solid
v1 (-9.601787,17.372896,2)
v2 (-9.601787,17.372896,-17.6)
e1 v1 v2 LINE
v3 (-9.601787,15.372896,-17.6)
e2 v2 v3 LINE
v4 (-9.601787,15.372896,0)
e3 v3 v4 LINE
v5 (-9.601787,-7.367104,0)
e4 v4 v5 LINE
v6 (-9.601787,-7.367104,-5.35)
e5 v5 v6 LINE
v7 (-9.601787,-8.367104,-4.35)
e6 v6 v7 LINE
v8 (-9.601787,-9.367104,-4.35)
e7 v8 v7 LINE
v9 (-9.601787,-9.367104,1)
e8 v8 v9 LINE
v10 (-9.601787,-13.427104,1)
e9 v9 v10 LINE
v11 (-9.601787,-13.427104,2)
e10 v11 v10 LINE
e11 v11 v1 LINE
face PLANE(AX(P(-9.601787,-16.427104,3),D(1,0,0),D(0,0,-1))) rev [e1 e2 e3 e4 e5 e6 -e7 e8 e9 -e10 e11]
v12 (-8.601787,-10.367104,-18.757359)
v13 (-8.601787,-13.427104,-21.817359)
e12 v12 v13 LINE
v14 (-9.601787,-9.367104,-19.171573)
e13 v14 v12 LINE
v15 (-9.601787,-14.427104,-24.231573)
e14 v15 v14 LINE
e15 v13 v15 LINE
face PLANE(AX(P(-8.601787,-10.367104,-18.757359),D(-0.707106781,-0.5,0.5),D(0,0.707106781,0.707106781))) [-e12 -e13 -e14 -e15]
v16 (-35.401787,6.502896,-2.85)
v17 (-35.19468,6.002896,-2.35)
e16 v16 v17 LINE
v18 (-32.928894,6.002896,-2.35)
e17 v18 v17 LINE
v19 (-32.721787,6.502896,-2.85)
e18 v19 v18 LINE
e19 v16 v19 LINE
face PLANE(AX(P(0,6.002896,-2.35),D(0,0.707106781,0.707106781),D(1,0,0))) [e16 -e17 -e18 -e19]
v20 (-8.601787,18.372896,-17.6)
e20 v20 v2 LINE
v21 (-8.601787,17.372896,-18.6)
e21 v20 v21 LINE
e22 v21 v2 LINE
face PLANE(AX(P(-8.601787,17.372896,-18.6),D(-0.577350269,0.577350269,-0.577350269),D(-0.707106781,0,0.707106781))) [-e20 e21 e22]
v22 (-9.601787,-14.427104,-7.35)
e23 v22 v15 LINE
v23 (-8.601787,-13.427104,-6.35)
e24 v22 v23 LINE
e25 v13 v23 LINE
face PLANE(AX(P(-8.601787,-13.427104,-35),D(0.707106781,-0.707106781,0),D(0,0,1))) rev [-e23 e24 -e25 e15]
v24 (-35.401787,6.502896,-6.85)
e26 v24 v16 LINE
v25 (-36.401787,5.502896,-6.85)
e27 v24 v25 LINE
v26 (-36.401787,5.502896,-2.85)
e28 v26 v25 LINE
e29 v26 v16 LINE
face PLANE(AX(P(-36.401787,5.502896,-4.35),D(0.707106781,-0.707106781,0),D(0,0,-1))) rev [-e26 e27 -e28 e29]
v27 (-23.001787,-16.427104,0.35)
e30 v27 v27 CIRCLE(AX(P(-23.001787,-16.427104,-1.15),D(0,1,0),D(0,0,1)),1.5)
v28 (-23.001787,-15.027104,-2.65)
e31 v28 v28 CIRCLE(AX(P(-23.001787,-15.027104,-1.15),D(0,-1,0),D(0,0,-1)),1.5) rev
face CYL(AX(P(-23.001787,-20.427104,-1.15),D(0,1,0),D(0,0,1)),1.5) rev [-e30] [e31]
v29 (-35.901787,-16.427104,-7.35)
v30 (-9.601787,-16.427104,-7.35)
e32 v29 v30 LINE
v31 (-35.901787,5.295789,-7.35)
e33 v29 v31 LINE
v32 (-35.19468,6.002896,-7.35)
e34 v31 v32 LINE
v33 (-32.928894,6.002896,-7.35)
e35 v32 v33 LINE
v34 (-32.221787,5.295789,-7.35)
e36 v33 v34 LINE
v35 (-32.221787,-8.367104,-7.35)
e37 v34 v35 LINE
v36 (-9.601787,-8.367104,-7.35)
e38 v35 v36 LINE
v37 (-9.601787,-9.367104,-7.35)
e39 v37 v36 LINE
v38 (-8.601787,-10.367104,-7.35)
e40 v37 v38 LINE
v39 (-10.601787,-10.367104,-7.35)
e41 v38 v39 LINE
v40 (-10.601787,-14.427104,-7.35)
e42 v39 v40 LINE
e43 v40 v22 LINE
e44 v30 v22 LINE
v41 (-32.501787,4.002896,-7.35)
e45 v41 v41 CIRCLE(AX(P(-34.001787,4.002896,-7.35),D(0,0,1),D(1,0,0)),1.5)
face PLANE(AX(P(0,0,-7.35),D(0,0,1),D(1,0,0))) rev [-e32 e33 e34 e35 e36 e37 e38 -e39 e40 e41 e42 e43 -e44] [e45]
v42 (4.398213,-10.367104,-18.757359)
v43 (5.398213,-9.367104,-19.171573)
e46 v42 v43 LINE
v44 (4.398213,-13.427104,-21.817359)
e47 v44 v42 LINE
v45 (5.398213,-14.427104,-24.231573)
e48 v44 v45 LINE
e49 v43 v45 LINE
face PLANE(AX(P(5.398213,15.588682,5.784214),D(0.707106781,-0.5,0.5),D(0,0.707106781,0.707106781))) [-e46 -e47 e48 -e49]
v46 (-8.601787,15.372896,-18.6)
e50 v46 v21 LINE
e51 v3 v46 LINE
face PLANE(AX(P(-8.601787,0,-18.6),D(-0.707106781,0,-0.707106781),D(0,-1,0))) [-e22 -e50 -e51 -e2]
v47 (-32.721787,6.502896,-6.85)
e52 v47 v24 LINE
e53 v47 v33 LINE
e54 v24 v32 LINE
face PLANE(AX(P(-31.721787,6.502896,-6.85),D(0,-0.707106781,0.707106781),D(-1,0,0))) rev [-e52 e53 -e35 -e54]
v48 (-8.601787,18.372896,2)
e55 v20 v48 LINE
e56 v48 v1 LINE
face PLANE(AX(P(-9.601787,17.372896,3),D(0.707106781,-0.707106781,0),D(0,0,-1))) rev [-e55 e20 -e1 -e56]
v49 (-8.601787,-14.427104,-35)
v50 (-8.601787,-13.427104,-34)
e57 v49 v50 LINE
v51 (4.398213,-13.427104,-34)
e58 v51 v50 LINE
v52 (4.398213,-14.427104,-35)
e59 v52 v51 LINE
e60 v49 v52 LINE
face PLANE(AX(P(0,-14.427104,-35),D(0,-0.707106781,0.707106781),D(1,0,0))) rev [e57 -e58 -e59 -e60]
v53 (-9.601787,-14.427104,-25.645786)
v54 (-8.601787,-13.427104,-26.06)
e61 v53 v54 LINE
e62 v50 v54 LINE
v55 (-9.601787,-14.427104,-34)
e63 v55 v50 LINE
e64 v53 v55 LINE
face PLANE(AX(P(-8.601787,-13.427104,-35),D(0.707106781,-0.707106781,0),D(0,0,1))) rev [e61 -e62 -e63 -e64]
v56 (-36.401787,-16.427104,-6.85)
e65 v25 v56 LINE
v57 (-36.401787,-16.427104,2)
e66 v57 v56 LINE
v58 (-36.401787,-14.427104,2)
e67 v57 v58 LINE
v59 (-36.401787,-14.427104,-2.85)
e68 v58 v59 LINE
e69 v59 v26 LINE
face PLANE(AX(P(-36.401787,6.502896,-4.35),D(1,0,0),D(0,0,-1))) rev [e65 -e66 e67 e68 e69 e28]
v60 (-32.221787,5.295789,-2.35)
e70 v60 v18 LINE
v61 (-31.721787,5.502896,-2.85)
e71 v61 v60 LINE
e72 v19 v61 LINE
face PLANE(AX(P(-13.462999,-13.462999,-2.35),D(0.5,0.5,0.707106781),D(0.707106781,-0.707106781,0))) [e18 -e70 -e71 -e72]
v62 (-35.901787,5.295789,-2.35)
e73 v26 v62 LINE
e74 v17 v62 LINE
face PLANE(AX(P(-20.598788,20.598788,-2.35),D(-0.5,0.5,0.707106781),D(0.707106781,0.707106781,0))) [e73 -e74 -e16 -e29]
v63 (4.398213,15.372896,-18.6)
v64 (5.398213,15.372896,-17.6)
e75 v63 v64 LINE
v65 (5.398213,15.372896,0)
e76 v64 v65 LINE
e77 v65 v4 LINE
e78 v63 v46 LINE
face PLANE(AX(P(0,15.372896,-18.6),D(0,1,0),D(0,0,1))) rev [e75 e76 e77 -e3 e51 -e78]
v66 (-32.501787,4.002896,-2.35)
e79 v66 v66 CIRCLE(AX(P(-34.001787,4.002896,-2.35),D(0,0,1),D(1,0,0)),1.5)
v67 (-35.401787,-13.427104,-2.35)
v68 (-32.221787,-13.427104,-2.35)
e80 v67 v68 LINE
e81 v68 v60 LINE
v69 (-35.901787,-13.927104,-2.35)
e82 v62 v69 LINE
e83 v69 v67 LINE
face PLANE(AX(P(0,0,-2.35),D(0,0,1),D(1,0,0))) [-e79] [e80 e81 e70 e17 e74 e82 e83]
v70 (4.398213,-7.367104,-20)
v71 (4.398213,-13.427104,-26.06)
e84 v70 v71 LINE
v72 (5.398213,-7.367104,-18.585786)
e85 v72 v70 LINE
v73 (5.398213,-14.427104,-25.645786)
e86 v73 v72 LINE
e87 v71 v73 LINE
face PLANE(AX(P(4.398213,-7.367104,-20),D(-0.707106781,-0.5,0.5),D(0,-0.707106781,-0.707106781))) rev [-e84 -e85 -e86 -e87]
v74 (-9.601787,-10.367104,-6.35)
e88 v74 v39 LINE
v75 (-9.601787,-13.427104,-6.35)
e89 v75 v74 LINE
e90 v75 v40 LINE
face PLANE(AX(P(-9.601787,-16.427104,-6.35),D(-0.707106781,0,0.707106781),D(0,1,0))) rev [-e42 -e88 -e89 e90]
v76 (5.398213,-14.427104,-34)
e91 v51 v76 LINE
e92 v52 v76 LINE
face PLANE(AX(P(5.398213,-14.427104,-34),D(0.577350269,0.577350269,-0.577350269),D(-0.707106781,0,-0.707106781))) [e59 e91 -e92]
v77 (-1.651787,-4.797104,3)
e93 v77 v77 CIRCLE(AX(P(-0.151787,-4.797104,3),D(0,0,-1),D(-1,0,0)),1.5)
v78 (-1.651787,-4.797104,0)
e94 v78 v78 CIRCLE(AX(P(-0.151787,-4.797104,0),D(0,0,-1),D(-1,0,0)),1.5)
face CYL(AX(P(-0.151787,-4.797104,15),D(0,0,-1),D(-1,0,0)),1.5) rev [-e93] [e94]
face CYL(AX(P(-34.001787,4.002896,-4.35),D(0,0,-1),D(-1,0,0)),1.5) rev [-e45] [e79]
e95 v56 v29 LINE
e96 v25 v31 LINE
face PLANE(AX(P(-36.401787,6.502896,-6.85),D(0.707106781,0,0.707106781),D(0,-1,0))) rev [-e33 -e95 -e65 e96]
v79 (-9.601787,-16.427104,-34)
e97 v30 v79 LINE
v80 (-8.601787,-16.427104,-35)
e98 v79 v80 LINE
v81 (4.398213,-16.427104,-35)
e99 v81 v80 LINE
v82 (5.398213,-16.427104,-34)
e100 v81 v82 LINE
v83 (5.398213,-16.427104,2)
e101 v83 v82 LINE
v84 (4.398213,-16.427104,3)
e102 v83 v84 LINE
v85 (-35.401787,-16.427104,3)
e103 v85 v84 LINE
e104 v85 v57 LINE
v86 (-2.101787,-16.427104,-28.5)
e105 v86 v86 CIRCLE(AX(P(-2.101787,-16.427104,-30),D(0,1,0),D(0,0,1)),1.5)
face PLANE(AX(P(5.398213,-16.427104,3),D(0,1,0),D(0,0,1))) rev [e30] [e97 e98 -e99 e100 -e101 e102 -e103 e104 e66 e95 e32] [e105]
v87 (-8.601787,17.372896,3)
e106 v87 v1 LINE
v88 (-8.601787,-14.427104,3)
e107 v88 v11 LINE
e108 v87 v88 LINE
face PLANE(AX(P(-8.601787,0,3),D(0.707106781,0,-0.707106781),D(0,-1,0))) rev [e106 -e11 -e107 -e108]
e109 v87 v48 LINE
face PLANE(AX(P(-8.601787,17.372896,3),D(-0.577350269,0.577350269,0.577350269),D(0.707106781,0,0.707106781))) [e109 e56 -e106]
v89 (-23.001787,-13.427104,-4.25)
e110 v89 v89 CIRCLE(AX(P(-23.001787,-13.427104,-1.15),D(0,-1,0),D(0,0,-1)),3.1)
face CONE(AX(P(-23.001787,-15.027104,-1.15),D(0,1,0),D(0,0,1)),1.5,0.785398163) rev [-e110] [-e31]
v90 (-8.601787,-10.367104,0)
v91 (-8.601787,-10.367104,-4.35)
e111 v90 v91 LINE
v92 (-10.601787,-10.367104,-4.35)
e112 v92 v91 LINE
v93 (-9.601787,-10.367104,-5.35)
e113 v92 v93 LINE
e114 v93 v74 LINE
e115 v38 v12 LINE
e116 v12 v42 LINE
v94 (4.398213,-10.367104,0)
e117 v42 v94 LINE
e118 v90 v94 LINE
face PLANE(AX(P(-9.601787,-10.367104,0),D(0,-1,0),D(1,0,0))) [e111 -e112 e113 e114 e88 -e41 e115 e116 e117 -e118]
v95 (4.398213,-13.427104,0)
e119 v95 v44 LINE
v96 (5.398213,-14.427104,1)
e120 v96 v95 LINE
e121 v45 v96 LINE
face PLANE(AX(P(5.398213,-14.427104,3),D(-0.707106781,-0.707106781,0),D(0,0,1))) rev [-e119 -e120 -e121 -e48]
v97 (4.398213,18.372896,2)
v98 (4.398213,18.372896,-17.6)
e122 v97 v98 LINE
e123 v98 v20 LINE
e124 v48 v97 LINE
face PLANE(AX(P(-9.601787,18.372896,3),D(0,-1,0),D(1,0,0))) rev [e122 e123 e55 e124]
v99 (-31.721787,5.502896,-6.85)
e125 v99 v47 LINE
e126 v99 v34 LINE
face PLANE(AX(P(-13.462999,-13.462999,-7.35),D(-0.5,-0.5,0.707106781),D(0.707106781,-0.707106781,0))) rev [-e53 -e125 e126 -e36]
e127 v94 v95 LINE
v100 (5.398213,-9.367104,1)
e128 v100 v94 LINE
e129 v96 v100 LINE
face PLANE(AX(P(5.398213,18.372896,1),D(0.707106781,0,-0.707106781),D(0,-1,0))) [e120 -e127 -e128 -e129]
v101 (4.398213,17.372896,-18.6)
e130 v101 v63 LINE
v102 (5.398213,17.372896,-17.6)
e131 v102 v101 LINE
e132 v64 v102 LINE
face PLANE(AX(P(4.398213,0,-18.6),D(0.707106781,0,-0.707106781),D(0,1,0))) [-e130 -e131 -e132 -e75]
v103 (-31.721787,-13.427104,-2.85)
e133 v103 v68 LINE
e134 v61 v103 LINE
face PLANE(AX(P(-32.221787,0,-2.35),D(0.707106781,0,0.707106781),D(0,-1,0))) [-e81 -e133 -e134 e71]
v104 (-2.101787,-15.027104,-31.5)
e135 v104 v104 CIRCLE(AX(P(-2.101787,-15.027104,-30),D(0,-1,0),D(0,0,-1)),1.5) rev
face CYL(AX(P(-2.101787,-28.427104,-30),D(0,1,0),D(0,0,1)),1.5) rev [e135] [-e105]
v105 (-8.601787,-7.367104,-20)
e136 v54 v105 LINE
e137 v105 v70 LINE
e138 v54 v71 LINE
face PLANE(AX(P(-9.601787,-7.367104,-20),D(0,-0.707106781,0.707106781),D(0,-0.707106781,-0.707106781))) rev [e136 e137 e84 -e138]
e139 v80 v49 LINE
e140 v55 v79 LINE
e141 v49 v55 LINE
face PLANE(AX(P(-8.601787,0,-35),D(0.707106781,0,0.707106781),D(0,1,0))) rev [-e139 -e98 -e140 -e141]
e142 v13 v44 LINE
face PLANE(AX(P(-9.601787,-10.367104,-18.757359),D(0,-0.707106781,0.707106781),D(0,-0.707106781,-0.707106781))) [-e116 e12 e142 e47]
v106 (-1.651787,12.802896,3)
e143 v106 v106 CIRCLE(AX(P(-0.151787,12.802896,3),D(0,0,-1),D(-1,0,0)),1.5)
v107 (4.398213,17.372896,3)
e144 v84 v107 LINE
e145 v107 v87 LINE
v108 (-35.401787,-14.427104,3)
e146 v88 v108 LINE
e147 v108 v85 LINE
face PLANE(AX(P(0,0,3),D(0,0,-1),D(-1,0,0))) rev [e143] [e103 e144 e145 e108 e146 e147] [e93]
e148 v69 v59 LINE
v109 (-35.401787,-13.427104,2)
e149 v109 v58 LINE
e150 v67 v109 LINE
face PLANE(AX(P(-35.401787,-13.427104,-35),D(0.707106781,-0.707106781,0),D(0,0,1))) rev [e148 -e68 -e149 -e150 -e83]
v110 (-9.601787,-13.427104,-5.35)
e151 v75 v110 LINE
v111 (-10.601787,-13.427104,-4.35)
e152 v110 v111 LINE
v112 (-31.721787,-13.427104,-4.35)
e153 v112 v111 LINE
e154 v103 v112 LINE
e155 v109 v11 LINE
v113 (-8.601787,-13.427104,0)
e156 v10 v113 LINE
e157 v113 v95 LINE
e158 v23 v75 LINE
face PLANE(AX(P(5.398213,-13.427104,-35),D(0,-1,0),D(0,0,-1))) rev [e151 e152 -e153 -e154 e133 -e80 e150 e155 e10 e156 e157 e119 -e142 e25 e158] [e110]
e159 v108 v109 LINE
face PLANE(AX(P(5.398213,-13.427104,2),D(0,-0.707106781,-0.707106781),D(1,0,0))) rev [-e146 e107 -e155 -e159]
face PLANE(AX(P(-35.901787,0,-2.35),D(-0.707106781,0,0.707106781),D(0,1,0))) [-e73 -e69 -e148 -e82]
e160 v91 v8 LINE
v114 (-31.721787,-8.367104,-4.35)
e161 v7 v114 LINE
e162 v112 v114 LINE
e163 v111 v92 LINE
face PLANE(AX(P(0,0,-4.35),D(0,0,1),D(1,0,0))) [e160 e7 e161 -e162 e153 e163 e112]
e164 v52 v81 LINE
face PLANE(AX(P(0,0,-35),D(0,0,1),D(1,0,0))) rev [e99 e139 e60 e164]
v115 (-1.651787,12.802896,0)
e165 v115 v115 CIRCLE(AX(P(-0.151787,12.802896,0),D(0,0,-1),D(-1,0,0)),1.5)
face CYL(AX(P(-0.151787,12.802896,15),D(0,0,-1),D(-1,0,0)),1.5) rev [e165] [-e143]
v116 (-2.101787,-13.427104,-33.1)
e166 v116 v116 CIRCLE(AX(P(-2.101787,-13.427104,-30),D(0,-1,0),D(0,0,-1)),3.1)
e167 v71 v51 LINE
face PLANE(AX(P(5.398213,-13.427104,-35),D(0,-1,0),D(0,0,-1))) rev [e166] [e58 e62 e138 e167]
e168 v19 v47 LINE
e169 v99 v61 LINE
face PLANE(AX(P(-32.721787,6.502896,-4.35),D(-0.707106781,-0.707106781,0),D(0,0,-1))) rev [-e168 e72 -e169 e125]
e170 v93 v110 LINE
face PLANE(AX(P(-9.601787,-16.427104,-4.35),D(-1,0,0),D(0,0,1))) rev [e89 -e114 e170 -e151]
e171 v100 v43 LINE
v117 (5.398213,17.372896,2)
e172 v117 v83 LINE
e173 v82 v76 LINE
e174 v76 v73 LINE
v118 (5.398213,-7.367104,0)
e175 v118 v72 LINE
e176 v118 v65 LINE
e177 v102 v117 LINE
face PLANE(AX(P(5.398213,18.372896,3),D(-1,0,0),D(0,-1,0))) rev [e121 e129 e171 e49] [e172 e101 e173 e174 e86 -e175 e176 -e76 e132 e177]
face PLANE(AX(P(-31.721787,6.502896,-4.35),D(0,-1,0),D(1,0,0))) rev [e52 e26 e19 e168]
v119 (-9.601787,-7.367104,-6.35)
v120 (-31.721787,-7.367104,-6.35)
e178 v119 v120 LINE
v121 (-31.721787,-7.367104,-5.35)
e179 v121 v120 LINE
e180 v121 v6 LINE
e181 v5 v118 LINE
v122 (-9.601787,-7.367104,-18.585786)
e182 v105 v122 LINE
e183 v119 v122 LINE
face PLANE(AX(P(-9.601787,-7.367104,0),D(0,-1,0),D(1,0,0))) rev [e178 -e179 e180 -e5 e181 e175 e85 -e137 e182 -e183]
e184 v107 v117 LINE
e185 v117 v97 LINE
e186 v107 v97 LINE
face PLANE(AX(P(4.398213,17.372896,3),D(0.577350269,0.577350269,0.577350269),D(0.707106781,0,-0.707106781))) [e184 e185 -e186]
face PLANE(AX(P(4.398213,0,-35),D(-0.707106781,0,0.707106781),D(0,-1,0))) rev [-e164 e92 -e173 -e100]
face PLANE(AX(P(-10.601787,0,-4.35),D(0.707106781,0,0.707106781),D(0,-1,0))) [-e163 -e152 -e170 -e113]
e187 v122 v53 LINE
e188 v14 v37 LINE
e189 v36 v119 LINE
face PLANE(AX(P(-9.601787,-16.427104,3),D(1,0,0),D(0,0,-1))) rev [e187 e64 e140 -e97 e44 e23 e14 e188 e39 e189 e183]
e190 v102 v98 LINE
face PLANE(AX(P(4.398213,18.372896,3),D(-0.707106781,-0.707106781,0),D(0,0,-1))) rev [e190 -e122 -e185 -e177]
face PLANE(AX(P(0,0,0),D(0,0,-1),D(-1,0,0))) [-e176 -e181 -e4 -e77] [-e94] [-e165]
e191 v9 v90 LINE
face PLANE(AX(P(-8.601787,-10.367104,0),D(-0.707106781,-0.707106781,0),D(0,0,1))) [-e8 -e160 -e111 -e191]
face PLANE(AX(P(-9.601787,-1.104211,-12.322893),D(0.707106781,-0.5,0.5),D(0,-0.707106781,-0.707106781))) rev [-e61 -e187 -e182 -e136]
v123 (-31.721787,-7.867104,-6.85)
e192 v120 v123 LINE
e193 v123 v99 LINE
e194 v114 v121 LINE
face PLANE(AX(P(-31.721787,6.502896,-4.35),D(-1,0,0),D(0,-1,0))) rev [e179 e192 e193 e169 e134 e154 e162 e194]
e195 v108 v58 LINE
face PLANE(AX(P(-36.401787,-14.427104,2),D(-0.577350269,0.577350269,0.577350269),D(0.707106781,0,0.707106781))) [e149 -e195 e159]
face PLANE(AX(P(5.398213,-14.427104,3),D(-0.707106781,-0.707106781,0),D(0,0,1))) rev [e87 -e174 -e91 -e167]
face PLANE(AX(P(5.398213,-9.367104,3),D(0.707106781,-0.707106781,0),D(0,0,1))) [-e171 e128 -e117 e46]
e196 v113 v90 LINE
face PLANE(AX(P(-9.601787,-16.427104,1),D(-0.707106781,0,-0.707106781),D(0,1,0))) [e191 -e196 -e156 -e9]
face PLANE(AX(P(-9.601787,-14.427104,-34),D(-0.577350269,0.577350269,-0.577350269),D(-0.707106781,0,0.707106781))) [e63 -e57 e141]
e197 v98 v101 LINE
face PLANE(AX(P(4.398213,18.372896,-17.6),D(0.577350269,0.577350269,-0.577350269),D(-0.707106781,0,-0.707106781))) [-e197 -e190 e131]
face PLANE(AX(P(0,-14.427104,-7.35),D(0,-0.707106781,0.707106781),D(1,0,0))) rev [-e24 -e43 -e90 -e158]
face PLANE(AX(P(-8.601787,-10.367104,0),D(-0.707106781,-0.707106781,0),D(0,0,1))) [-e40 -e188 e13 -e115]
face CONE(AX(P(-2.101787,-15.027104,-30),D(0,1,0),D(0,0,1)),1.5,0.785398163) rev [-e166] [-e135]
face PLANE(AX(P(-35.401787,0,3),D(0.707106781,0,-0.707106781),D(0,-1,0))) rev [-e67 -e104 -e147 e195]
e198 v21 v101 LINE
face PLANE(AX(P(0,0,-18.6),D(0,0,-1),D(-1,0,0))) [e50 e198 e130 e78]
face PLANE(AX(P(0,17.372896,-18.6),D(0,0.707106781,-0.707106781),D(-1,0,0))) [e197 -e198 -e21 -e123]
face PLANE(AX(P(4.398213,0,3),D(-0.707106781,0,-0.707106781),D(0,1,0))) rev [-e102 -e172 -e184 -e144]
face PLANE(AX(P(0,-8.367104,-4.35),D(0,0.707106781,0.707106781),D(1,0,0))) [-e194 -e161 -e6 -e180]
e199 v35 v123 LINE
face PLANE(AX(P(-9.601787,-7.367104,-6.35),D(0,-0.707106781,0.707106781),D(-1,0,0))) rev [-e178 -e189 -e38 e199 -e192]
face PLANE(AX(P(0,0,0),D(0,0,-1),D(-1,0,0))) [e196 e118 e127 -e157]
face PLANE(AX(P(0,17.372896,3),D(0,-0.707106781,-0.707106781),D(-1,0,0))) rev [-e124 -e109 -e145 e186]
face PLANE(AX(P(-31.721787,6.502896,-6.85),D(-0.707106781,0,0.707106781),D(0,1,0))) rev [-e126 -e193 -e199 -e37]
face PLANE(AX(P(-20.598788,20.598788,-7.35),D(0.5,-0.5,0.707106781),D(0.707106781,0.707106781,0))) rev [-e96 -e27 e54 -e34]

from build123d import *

# Parameters (mm, degrees)
ESBO_O3_W                 = 15
ESBO_O3_H                 = 34.8
RESSALTO_EXTRUS_O1_DEPTH  = 3
ESBO_O5_W                 = 15
ESBO_O5_H                 = 3
RESSALTO_EXTRUS_O2_DEPTH  = 18.6
ESBO_O6_W                 = 15
ESBO_O6_H                 = 3
RESSALTO_EXTRUS_O3_DEPTH  = 35
ESBO_O8_R                 = 1.5
CORTE_EXTRUS_O1_DEPTH     = 15
ESBO_O10_R                = 1.5
CORTE_EXTRUS_O3_DEPTH     = 15
CHANFRO2_SIZE             = 1.6
RESSALTO_EXTRUS_O5_DEPTH  = 15
ESBO_O14_R                = 1.5
RESSALTO_EXTRUS_O7_DEPTH  = 3
RESSALTO_EXTRUS_O9_DEPTH  = 26.8
CHANFRO6_SIZE             = 1
CHANFRO7_SIZE             = 1
CHANFRO8_SIZE             = 1
ESBO_O19_W                = 4.68
ESBO_O19_H                = 19.93
ESBO_O19_R                = 1.5
RESSALTO_EXTRUS_O10_DEPTH = 2
ESBO_O17_R                = 1.5
CORTE_EXTRUS_O4_DEPTH     = 7
CHANFRO4_SIZE             = 1
CHANFRO10_SIZE            = 1.6
CHANFRO11_SIZE            = 0.5


with BuildPart() as part:
    # Esboço3 → Ressalto-extrusão1 (new body)
    with BuildSketch(Plane.XY):
        with Locations((-2.101786792, 0.972895567)):
            Rectangle(ESBO_O3_W, ESBO_O3_H)
    extrude(amount=RESSALTO_EXTRUS_O1_DEPTH)

    # Esboço5 → Ressalto-extrusão2 (add)
    with BuildSketch(Plane(origin=(0, 0, 0), x_dir=(-1, 0, 0), z_dir=(0, 0, -1))):
        with Locations((2.101786792, 16.872895567)):
            Rectangle(ESBO_O5_W, ESBO_O5_H)
    extrude(amount=RESSALTO_EXTRUS_O2_DEPTH)

    # Esboço6 → Ressalto-extrusão3 (add)
    with BuildSketch(Plane(origin=(0, 0, 0), x_dir=(-1, 0, 0), z_dir=(0, 0, -1))):
        with Locations((2.101786792, -14.927104433)):
            Rectangle(ESBO_O6_W, ESBO_O6_H)
    extrude(amount=RESSALTO_EXTRUS_O3_DEPTH)

    # Esboço8 → Corte-extrusão1 (cut)
    with BuildSketch(Plane(origin=(0, 0, 0), x_dir=(-1, 0, 0), z_dir=(0, 0, -1))):
        with Locations((0.151786792, 12.802895567)):
            Circle(ESBO_O8_R)
        with Locations((0.151786792, -4.797104433)):
            Circle(ESBO_O8_R)
    extrude(amount=-CORTE_EXTRUS_O1_DEPTH, mode=Mode.SUBTRACT)

    # Esboço10 → Corte-extrusão3 (cut)
    with BuildSketch(Plane(origin=(0, -13.427104433, 0), x_dir=(1, 0, 0), z_dir=(0, 1, 0))):
        with Locations(Location((-2.101786792, 30, 0), (0, 0, 270))):
            Circle(ESBO_O10_R)
    extrude(amount=-CORTE_EXTRUS_O3_DEPTH, mode=Mode.SUBTRACT)

    # Chanfro2
    chanfro2_edges = [part.edges().sort_by_distance(p)[0] for p in [
        (-2.101786792, -13.427104433, -31.5),
    ]]
    chamfer(chanfro2_edges, length=CHANFRO2_SIZE)

    # Esboço11 → Ressalto-extrusão5 (add)
    with BuildSketch(Plane(origin=(5.398213208, 0, 0), x_dir=(0, 0, -1), z_dir=(1, 0, 0))):
        Polygon((7e-08, -7.367104433), (20, -7.367104433), (26.06, -13.427104433), (21.81735926, -13.427104379), (18.757359313, -10.367104433), (3.2e-08, -10.367104433), align=None)
    extrude(amount=-RESSALTO_EXTRUS_O5_DEPTH)

    # Esboço14 → Ressalto-extrusão7 (add)
    with BuildSketch(Plane.XY.offset(-7.35)):
        Polygon((-31.721786792, 6.502895567), (-31.721786792, -7.367104433), (-9.601786792, -7.367104433), (-9.601786792, -16.427104433), (-31.721786792, -16.427104433), (-36.401786792, -16.427104433), (-36.401786792, 6.502895567), align=None)
        with Locations((-34.001786792, 4.002895567)):
            Circle(ESBO_O14_R, mode=Mode.SUBTRACT)
    extrude(amount=RESSALTO_EXTRUS_O7_DEPTH)

    # Esboço16 → Ressalto-extrusão9 (add)
    with BuildSketch(Plane.ZY.offset(9.601786792)):
        Polygon((0, -13.427104433), (-4.35, -13.427104433), (-4.35, -16.427104433), (3, -16.427104433), (3, -13.427104433), align=None)
    extrude(amount=RESSALTO_EXTRUS_O9_DEPTH)

    # Chanfro6
    chanfro6_edges = [part.edges().sort_by_distance(p)[0] for p in [
        (-9.601786792, -11.897104433, -4.35),
        (-9.601786792, -11.897104433, -7.35),
    ]]
    chamfer(chanfro6_edges, length=CHANFRO6_SIZE)

    # Chanfro7
    chanfro7_edges = [part.edges().sort_by_distance(p)[0] for p in [
        (-9.601786792, -13.427104433, -14.58367963),
    ]]
    chamfer(chanfro7_edges, length=CHANFRO7_SIZE)

    # Chanfro8
    chanfro8_edges = [part.edges().sort_by_distance(p)[0] for p in [
        (-9.601786792, -13.427104433, -7.35),
    ]]
    chamfer(chanfro8_edges, length=CHANFRO8_SIZE)

    # Esboço19 → Ressalto-extrusão10 (add)
    with BuildSketch(Plane.XY.offset(-4.35)):
        with Locations((-34.061786792, -3.462104433)):
            Rectangle(ESBO_O19_W, ESBO_O19_H)
        with Locations((-34.001786792, 4.002895567)):
            Circle(ESBO_O19_R, mode=Mode.SUBTRACT)
    extrude(amount=RESSALTO_EXTRUS_O10_DEPTH)

    # Esboço17 → Corte-extrusão4 (cut)
    with BuildSketch(Plane(origin=(0, -13.427104433, 0), x_dir=(1, 0, 0), z_dir=(0, 1, 0))):
        with Locations(Location((-23.001786792, 1.15, 0), (0, 0, 270))):
            Circle(ESBO_O17_R)
    extrude(amount=-CORTE_EXTRUS_O4_DEPTH, mode=Mode.SUBTRACT)

    # Chanfro4
    chanfro4_edges = [part.edges().sort_by_distance(p)[0] for p in [
        (-23.001786792, -13.427104433, 3),
        (-36.401786792, -14.927104433, 3),
        (-2.101786792, 18.372895567, 3),
        (-9.601786792, 2.472895567, 3),
        (5.398213208, 16.872895567, -18.6),
        (-9.601786792, 16.872895567, -18.6),
        (-2.101786792, 18.372895567, -18.6),
        (-36.401786792, -13.427104433, 0.325),
        (5.398213208, -11.897104433, 0),
        (5.398213208, -13.427104433, -30.53),
        (-9.601786792, -13.427104433, -30.53),
        (5.398213208, -14.927104433, -35),
        (-9.601786792, -14.927104433, -35),
        (-2.101786792, -13.427104433, -35),
        (5.398213208, -13.427104433, -10.90867963),
        (-9.601786792, -11.897104433, 0),
        (5.398213208, -10.397104433, -23.03),
        (-9.601786792, -12.397104433, -20.787359313),
        (-9.601786792, -10.367104433, -2.175000016),
        (-9.601786792, -10.397104433, -23.03),
        (5.398213208, -10.367104433, -9.378679672),
        (5.398213208, -11.897104406, -20.287359286),
        (-9.601786792, 18.372895567, -7.8),
        (5.398213208, 18.372895567, -7.8),
        (-9.601786792, -10.367104433, -13.053679656),
        (5.398213208, 0.972895567, 3),
        (-20.661786792, -7.367104433, -4.35),
        (-20.661786792, -7.367104433, -7.35),
        (-31.721786792, 6.502895567, -4.85),
        (-36.401786792, 6.502895567, -4.85),
    ]]
    chamfer(chanfro4_edges, length=CHANFRO4_SIZE - 0.0001)  # a hair under: the kernel refuses the full size

    # Chanfro10
    chanfro10_edges = [part.edges().sort_by_distance(p)[0] for p in [
        (-23.001786792, -13.427104433, -2.65),
    ]]
    chamfer(chanfro10_edges, length=CHANFRO10_SIZE)

    # Chanfro11
    chanfro11_edges = [part.edges().sort_by_distance(p)[0] for p in [
        (-31.721786792, -3.962054433, -2.35),
        (-36.401786792, -5.462054433, -7.35),
        (-36.401786792, -4.462004433, -2.35),
        (-34.061786792, 6.502895567, -7.35),
        (-32.221736792, 6.002945567, -7.35),
        (-35.901836792, 6.002945567, -7.35),
        (-34.061786792, 6.502895567, -2.35),
        (-32.221736792, 6.002945567, -2.35),
        (-35.901836792, 6.002945567, -2.35),
        (-31.721786792, -1.432004433, -7.35),
    ]]
    chamfer(chanfro11_edges, length=CHANFRO11_SIZE)


solid = part.part
